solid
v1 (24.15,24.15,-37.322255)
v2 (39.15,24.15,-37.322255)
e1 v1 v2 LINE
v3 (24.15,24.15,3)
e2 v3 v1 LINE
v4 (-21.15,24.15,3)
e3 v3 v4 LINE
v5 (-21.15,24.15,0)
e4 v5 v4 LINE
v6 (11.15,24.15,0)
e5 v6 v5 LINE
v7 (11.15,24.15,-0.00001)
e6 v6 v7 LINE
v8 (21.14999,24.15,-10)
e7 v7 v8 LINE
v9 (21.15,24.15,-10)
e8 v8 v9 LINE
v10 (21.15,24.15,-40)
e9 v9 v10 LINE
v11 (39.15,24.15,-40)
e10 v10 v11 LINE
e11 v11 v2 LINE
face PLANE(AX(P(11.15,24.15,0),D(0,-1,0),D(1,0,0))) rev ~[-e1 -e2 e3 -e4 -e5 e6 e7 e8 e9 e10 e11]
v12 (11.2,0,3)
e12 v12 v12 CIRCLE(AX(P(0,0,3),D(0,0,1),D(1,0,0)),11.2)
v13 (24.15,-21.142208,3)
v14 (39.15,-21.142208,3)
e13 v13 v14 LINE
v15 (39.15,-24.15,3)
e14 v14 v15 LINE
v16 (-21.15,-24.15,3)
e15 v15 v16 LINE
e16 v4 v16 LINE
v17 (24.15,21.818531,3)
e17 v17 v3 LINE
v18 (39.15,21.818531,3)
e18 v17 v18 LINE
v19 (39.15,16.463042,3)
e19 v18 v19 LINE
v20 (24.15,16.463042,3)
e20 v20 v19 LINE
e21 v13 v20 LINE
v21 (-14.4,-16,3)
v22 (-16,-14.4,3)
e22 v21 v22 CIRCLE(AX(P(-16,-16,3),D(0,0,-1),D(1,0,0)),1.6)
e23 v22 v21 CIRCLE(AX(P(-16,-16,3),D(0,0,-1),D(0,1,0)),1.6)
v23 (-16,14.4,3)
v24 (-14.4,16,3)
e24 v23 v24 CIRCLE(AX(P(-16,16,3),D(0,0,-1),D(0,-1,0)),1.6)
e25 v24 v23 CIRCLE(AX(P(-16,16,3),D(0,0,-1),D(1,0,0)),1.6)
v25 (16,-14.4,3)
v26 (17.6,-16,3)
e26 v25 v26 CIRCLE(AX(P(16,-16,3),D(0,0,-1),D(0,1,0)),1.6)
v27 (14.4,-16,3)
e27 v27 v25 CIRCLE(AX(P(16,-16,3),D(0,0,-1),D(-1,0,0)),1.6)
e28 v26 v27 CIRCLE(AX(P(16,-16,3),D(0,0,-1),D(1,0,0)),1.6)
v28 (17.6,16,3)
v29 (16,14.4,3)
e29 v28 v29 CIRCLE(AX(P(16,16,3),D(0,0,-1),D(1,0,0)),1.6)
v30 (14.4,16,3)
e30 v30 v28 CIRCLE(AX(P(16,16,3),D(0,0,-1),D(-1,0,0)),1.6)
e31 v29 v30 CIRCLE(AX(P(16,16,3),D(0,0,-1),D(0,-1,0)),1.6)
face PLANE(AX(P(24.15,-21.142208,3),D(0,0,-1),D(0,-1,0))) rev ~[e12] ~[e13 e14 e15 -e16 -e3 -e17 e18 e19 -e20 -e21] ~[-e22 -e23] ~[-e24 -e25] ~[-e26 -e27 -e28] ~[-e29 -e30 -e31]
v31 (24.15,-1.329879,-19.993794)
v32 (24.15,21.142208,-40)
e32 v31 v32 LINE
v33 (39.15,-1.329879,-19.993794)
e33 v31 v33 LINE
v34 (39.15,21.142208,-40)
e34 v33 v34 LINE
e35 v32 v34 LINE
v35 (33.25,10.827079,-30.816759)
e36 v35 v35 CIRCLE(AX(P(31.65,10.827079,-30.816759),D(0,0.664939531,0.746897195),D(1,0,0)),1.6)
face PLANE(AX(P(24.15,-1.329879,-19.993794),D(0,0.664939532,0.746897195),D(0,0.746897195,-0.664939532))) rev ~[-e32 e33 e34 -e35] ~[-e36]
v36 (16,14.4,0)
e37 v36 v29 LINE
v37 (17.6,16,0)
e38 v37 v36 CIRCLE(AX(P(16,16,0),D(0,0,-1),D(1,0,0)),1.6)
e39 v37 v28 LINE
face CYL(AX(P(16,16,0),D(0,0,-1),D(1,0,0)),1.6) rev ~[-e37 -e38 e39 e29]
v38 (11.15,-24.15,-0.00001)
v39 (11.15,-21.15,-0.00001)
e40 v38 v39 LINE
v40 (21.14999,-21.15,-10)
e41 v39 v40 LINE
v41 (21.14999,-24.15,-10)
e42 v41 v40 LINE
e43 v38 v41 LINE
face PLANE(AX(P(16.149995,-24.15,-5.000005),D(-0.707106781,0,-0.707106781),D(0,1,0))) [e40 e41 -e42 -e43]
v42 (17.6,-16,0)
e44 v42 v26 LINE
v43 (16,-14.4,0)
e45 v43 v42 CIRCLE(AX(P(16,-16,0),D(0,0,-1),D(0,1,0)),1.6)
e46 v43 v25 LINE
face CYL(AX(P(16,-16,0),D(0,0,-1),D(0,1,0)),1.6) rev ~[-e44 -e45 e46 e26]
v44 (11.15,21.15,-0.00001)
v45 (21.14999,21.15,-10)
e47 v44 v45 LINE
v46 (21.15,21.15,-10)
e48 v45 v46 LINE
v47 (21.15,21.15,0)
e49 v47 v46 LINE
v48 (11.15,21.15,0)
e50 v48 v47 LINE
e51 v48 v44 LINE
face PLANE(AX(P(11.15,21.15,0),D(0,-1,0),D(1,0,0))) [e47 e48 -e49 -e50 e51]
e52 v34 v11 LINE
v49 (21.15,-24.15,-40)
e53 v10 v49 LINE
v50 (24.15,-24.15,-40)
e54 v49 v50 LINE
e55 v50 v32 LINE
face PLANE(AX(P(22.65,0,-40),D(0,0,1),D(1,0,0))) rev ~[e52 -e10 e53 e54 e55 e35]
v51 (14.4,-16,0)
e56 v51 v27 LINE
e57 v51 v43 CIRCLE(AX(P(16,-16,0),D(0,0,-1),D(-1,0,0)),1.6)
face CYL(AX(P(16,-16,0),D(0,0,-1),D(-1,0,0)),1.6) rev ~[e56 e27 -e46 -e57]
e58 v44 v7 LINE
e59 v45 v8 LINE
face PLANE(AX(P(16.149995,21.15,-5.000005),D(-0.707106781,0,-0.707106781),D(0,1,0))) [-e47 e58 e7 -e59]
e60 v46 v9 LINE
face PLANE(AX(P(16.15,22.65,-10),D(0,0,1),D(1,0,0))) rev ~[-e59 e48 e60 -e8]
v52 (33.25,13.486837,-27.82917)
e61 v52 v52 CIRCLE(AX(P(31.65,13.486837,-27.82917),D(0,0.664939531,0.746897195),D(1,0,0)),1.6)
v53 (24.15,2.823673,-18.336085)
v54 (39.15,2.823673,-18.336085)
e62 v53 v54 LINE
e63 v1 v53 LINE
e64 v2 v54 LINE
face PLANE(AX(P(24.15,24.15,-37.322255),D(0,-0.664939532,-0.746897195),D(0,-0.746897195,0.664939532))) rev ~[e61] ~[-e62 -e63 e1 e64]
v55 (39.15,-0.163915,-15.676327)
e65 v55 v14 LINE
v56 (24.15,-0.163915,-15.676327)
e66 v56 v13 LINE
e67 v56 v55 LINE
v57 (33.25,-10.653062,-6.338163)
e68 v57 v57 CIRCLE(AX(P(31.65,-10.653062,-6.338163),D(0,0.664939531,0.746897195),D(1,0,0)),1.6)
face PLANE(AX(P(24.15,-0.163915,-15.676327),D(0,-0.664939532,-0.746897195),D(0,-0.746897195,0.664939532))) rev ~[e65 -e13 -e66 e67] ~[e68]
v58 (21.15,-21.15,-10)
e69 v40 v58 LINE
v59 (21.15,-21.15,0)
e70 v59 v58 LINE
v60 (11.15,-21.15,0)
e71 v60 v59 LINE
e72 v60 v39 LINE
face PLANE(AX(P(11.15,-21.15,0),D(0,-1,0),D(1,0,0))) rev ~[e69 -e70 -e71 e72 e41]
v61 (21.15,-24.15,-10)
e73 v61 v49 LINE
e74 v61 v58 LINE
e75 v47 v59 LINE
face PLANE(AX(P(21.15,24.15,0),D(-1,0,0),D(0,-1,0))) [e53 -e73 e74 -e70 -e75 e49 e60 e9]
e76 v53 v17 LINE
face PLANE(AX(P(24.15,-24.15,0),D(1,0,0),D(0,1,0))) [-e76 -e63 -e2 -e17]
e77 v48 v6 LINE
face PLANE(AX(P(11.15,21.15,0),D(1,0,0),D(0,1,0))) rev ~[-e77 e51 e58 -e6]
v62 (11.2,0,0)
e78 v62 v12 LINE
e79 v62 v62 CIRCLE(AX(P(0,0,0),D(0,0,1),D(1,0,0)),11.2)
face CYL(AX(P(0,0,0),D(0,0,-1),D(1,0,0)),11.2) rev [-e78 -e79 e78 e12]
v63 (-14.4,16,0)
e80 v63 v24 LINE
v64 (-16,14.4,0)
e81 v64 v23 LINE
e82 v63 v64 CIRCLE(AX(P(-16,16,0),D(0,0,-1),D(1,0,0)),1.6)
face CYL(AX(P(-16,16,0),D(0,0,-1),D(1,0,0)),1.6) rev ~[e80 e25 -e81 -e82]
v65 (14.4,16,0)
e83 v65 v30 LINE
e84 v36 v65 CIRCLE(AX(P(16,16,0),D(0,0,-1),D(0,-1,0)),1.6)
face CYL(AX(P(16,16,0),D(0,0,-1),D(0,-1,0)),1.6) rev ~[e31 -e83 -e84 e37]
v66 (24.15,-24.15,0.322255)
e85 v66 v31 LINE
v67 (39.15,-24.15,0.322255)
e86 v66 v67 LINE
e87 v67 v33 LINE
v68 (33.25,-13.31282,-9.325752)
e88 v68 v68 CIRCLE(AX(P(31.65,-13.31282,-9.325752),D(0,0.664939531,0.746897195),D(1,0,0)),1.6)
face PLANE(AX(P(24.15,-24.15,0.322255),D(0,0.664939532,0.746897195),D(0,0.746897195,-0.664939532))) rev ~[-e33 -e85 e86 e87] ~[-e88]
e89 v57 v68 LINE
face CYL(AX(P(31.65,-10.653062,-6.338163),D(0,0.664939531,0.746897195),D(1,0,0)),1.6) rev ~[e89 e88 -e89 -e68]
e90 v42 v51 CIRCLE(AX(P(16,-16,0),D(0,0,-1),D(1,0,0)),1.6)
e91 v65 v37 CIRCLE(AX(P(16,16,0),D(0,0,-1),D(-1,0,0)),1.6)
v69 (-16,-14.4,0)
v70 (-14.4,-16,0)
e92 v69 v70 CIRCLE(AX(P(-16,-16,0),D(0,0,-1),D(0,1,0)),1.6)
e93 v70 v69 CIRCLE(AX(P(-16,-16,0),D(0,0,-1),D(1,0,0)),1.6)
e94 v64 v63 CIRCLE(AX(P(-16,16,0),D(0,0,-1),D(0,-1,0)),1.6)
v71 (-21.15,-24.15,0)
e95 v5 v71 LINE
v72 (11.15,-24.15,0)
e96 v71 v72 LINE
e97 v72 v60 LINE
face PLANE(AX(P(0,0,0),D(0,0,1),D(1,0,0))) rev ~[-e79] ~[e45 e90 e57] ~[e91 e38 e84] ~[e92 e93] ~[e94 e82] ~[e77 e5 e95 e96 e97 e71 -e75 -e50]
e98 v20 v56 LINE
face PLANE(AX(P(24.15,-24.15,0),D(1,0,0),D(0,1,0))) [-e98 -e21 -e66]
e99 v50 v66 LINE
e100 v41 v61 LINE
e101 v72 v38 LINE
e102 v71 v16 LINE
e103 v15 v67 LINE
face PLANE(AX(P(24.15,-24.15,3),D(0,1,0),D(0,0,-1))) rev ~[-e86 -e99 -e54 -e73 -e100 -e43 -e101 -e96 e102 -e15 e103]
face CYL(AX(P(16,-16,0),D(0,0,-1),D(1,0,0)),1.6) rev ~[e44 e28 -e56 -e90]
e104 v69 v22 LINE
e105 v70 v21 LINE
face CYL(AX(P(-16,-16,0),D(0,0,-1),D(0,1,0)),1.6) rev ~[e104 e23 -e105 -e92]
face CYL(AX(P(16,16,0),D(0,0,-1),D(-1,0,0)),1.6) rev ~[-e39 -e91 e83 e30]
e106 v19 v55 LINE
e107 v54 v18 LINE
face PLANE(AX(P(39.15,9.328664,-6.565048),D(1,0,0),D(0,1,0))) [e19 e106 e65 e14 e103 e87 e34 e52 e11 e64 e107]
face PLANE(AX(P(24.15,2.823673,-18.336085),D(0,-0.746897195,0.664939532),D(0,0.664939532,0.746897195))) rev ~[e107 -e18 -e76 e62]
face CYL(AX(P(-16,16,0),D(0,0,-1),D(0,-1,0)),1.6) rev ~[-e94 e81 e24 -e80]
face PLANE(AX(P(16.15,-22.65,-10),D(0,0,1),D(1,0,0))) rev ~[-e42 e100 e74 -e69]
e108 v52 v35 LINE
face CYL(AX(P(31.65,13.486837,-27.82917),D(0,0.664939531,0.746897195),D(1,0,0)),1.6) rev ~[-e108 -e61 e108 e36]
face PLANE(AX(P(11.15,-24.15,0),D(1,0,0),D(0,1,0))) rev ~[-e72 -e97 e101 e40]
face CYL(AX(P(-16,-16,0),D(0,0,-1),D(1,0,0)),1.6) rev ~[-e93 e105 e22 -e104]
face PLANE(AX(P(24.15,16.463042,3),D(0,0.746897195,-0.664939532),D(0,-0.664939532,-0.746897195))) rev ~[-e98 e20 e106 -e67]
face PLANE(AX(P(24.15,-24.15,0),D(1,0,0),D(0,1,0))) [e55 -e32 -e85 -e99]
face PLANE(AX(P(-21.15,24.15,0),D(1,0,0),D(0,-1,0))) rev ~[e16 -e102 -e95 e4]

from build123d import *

# Parameters (mm, degrees)
F0_W     = 10
F0_H     = 3
F0_W_2   = 32.3
F0_R     = 11.2
F1_DEPTH = 3
F2_DEPTH = 40
F4_DEPTH = 15
F5_DEPTH = 10
F6_SIZE  = 9.99999
F7_R     = 1.6
F8_R     = 1.6
F9_DEPTH = 25


# Not quite as in the source:
# - a fillet or chamfer is up to 0.001 mm smaller than in the source, because OpenCascade refuses the exact size


with BuildPart() as f1:
    # F0 (on Top) → F1 (new body)
    with BuildSketch(Plane.XY):
        Polygon((21.15, -21.15), (21.15, 21.15), (11.15, 21.15), (-21.15, 21.15), (-21.15, -21.15), (11.15, -21.15), align=None)
        with BuildLine():
            ThreePointArc((-16, 14.4), (-17.1313708499, 17.1313708499), (-14.4, 16))
            Line((-14.4, 16), (14.4, 16))
            ThreePointArc((14.4, 16), (16, 17.6), (17.6, 16))
            ThreePointArc((17.6, 16), (17.1313708499, 14.8686291501), (16, 14.4))
            Line((16, 14.4), (16, -14.4))
            ThreePointArc((16, -14.4), (17.1313708499, -14.8686291501), (17.6, -16))
            ThreePointArc((17.6, -16), (16, -17.6), (14.4, -16))
            Line((14.4, -16), (-14.4, -16))
            ThreePointArc((-14.4, -16), (-17.1313708499, -17.1313708499), (-16, -14.4))
            Line((-16, -14.4), (-16, 14.4))
        make_face(mode=Mode.SUBTRACT)
        Polygon((21.15, 24.15), (21.15, 21.15), (21.15, -21.15), (21.15, -24.15), (24.15, -24.15), (24.15, 24.15), align=None)
        with Locations((16.15, 22.65)):
            Rectangle(F0_W, F0_H)
        with Locations((-5, 22.65)):
            Rectangle(F0_W_2, F0_H)
        with Locations((16.15, -22.65)):
            Rectangle(F0_W, F0_H)
        Polygon((11.15, -24.15), (11.15, -21.15), (-21.15, -21.15), (-21.15, -24.15), (9.2402426526, -24.15), align=None)
        with BuildLine():
            Line((14.4, 16), (-14.4, 16))
            ThreePointArc((-14.4, 16), (-14.8686291501, 14.8686291501), (-16, 14.4))
            Line((-16, 14.4), (-16, -14.4))
            ThreePointArc((-16, -14.4), (-14.8686291501, -14.8686291501), (-14.4, -16))
            Line((-14.4, -16), (14.4, -16))
            ThreePointArc((14.4, -16), (14.8686291501, -14.8686291501), (16, -14.4))
            Line((16, -14.4), (16, 14.4))
            ThreePointArc((16, 14.4), (14.8686291501, 14.8686291501), (14.4, 16))
        make_face()
        Circle(F0_R, mode=Mode.SUBTRACT)
    extrude(amount=F1_DEPTH)

    # F0 (on Top) → F2 (join)
    with BuildSketch(Plane.XY):
        Polygon((21.15, 24.15), (21.15, 21.15), (21.15, -21.15), (21.15, -24.15), (24.15, -24.15), (24.15, 24.15), align=None)
    extrude(amount=-F2_DEPTH)

    # F3 (on face) → F4 (join)
    with BuildSketch(Plane.YZ.offset(24.15)):
        Polygon((-0.1639153264, -15.6763265476), (1.329879063, -17.0062056106), (19.1407867495, 3), (16.4630420556, 3), align=None)
        Polygon((19.1407867495, 3), (1.329879063, -17.0062056106), (2.8236734524, -18.3360846736), (21.8185314434, 3), align=None)
        Polygon((1.329879063, -17.0062056106), (0, -18.5), (24.15, -40), (24.15, -37.3222553061), (2.8236734524, -18.3360846736), align=None)
        Polygon((24.15, -40), (0, -18.5), (-1.329879063, -19.9937943894), (21.1422077043, -40), align=None)
        Polygon((0, -18.5), (-24.15, 3), (-24.15, 0.3222553061), (-1.329879063, -19.9937943894), align=None)
        Polygon((-21.1422077043, 3), (-24.15, 3), (0, -18.5), (1.329879063, -17.0062056106), (-0.1639153264, -15.6763265476), align=None)
    extrude(amount=F4_DEPTH)

    # F0 (on Top) → F5 (join)
    with BuildSketch(Plane.XY):
        with Locations((16.15, 22.65)):
            Rectangle(F0_W, F0_H)
        with Locations((16.15, -22.65)):
            Rectangle(F0_W, F0_H)
    extrude(amount=-F5_DEPTH)

    # F6 (size 10 in the source; OpenCascade refuses exactly that, so slightly less here)
    f6_edges = [f1.edges().sort_by_distance(p)[0] for p in [
        (11.15, 22.65, -10),
        (11.15, -22.65, -10),
    ]]
    chamfer(f6_edges, length=F6_SIZE)

    # F7 (on face) + F8 (on face) → F9 (cut)
    with BuildSketch(Plane(origin=(0, -7.8579881454, -8.8265308702), x_dir=(1, 0, 0), z_dir=(0, 0.6649395315, 0.7468971947))):
        with Locations((31.65, 28.5779957713)):
            Circle(F7_R)
    with BuildSketch(Plane(origin=(0, -7.8579881454, -8.8265308702), x_dir=(1, 0, 0), z_dir=(0, 0.6649395315, 0.7468971947))):
        with Locations((31.65, -3.7422464428)):
            Circle(F8_R)
    extrude(amount=-F9_DEPTH, mode=Mode.SUBTRACT)


solid = f1.part
